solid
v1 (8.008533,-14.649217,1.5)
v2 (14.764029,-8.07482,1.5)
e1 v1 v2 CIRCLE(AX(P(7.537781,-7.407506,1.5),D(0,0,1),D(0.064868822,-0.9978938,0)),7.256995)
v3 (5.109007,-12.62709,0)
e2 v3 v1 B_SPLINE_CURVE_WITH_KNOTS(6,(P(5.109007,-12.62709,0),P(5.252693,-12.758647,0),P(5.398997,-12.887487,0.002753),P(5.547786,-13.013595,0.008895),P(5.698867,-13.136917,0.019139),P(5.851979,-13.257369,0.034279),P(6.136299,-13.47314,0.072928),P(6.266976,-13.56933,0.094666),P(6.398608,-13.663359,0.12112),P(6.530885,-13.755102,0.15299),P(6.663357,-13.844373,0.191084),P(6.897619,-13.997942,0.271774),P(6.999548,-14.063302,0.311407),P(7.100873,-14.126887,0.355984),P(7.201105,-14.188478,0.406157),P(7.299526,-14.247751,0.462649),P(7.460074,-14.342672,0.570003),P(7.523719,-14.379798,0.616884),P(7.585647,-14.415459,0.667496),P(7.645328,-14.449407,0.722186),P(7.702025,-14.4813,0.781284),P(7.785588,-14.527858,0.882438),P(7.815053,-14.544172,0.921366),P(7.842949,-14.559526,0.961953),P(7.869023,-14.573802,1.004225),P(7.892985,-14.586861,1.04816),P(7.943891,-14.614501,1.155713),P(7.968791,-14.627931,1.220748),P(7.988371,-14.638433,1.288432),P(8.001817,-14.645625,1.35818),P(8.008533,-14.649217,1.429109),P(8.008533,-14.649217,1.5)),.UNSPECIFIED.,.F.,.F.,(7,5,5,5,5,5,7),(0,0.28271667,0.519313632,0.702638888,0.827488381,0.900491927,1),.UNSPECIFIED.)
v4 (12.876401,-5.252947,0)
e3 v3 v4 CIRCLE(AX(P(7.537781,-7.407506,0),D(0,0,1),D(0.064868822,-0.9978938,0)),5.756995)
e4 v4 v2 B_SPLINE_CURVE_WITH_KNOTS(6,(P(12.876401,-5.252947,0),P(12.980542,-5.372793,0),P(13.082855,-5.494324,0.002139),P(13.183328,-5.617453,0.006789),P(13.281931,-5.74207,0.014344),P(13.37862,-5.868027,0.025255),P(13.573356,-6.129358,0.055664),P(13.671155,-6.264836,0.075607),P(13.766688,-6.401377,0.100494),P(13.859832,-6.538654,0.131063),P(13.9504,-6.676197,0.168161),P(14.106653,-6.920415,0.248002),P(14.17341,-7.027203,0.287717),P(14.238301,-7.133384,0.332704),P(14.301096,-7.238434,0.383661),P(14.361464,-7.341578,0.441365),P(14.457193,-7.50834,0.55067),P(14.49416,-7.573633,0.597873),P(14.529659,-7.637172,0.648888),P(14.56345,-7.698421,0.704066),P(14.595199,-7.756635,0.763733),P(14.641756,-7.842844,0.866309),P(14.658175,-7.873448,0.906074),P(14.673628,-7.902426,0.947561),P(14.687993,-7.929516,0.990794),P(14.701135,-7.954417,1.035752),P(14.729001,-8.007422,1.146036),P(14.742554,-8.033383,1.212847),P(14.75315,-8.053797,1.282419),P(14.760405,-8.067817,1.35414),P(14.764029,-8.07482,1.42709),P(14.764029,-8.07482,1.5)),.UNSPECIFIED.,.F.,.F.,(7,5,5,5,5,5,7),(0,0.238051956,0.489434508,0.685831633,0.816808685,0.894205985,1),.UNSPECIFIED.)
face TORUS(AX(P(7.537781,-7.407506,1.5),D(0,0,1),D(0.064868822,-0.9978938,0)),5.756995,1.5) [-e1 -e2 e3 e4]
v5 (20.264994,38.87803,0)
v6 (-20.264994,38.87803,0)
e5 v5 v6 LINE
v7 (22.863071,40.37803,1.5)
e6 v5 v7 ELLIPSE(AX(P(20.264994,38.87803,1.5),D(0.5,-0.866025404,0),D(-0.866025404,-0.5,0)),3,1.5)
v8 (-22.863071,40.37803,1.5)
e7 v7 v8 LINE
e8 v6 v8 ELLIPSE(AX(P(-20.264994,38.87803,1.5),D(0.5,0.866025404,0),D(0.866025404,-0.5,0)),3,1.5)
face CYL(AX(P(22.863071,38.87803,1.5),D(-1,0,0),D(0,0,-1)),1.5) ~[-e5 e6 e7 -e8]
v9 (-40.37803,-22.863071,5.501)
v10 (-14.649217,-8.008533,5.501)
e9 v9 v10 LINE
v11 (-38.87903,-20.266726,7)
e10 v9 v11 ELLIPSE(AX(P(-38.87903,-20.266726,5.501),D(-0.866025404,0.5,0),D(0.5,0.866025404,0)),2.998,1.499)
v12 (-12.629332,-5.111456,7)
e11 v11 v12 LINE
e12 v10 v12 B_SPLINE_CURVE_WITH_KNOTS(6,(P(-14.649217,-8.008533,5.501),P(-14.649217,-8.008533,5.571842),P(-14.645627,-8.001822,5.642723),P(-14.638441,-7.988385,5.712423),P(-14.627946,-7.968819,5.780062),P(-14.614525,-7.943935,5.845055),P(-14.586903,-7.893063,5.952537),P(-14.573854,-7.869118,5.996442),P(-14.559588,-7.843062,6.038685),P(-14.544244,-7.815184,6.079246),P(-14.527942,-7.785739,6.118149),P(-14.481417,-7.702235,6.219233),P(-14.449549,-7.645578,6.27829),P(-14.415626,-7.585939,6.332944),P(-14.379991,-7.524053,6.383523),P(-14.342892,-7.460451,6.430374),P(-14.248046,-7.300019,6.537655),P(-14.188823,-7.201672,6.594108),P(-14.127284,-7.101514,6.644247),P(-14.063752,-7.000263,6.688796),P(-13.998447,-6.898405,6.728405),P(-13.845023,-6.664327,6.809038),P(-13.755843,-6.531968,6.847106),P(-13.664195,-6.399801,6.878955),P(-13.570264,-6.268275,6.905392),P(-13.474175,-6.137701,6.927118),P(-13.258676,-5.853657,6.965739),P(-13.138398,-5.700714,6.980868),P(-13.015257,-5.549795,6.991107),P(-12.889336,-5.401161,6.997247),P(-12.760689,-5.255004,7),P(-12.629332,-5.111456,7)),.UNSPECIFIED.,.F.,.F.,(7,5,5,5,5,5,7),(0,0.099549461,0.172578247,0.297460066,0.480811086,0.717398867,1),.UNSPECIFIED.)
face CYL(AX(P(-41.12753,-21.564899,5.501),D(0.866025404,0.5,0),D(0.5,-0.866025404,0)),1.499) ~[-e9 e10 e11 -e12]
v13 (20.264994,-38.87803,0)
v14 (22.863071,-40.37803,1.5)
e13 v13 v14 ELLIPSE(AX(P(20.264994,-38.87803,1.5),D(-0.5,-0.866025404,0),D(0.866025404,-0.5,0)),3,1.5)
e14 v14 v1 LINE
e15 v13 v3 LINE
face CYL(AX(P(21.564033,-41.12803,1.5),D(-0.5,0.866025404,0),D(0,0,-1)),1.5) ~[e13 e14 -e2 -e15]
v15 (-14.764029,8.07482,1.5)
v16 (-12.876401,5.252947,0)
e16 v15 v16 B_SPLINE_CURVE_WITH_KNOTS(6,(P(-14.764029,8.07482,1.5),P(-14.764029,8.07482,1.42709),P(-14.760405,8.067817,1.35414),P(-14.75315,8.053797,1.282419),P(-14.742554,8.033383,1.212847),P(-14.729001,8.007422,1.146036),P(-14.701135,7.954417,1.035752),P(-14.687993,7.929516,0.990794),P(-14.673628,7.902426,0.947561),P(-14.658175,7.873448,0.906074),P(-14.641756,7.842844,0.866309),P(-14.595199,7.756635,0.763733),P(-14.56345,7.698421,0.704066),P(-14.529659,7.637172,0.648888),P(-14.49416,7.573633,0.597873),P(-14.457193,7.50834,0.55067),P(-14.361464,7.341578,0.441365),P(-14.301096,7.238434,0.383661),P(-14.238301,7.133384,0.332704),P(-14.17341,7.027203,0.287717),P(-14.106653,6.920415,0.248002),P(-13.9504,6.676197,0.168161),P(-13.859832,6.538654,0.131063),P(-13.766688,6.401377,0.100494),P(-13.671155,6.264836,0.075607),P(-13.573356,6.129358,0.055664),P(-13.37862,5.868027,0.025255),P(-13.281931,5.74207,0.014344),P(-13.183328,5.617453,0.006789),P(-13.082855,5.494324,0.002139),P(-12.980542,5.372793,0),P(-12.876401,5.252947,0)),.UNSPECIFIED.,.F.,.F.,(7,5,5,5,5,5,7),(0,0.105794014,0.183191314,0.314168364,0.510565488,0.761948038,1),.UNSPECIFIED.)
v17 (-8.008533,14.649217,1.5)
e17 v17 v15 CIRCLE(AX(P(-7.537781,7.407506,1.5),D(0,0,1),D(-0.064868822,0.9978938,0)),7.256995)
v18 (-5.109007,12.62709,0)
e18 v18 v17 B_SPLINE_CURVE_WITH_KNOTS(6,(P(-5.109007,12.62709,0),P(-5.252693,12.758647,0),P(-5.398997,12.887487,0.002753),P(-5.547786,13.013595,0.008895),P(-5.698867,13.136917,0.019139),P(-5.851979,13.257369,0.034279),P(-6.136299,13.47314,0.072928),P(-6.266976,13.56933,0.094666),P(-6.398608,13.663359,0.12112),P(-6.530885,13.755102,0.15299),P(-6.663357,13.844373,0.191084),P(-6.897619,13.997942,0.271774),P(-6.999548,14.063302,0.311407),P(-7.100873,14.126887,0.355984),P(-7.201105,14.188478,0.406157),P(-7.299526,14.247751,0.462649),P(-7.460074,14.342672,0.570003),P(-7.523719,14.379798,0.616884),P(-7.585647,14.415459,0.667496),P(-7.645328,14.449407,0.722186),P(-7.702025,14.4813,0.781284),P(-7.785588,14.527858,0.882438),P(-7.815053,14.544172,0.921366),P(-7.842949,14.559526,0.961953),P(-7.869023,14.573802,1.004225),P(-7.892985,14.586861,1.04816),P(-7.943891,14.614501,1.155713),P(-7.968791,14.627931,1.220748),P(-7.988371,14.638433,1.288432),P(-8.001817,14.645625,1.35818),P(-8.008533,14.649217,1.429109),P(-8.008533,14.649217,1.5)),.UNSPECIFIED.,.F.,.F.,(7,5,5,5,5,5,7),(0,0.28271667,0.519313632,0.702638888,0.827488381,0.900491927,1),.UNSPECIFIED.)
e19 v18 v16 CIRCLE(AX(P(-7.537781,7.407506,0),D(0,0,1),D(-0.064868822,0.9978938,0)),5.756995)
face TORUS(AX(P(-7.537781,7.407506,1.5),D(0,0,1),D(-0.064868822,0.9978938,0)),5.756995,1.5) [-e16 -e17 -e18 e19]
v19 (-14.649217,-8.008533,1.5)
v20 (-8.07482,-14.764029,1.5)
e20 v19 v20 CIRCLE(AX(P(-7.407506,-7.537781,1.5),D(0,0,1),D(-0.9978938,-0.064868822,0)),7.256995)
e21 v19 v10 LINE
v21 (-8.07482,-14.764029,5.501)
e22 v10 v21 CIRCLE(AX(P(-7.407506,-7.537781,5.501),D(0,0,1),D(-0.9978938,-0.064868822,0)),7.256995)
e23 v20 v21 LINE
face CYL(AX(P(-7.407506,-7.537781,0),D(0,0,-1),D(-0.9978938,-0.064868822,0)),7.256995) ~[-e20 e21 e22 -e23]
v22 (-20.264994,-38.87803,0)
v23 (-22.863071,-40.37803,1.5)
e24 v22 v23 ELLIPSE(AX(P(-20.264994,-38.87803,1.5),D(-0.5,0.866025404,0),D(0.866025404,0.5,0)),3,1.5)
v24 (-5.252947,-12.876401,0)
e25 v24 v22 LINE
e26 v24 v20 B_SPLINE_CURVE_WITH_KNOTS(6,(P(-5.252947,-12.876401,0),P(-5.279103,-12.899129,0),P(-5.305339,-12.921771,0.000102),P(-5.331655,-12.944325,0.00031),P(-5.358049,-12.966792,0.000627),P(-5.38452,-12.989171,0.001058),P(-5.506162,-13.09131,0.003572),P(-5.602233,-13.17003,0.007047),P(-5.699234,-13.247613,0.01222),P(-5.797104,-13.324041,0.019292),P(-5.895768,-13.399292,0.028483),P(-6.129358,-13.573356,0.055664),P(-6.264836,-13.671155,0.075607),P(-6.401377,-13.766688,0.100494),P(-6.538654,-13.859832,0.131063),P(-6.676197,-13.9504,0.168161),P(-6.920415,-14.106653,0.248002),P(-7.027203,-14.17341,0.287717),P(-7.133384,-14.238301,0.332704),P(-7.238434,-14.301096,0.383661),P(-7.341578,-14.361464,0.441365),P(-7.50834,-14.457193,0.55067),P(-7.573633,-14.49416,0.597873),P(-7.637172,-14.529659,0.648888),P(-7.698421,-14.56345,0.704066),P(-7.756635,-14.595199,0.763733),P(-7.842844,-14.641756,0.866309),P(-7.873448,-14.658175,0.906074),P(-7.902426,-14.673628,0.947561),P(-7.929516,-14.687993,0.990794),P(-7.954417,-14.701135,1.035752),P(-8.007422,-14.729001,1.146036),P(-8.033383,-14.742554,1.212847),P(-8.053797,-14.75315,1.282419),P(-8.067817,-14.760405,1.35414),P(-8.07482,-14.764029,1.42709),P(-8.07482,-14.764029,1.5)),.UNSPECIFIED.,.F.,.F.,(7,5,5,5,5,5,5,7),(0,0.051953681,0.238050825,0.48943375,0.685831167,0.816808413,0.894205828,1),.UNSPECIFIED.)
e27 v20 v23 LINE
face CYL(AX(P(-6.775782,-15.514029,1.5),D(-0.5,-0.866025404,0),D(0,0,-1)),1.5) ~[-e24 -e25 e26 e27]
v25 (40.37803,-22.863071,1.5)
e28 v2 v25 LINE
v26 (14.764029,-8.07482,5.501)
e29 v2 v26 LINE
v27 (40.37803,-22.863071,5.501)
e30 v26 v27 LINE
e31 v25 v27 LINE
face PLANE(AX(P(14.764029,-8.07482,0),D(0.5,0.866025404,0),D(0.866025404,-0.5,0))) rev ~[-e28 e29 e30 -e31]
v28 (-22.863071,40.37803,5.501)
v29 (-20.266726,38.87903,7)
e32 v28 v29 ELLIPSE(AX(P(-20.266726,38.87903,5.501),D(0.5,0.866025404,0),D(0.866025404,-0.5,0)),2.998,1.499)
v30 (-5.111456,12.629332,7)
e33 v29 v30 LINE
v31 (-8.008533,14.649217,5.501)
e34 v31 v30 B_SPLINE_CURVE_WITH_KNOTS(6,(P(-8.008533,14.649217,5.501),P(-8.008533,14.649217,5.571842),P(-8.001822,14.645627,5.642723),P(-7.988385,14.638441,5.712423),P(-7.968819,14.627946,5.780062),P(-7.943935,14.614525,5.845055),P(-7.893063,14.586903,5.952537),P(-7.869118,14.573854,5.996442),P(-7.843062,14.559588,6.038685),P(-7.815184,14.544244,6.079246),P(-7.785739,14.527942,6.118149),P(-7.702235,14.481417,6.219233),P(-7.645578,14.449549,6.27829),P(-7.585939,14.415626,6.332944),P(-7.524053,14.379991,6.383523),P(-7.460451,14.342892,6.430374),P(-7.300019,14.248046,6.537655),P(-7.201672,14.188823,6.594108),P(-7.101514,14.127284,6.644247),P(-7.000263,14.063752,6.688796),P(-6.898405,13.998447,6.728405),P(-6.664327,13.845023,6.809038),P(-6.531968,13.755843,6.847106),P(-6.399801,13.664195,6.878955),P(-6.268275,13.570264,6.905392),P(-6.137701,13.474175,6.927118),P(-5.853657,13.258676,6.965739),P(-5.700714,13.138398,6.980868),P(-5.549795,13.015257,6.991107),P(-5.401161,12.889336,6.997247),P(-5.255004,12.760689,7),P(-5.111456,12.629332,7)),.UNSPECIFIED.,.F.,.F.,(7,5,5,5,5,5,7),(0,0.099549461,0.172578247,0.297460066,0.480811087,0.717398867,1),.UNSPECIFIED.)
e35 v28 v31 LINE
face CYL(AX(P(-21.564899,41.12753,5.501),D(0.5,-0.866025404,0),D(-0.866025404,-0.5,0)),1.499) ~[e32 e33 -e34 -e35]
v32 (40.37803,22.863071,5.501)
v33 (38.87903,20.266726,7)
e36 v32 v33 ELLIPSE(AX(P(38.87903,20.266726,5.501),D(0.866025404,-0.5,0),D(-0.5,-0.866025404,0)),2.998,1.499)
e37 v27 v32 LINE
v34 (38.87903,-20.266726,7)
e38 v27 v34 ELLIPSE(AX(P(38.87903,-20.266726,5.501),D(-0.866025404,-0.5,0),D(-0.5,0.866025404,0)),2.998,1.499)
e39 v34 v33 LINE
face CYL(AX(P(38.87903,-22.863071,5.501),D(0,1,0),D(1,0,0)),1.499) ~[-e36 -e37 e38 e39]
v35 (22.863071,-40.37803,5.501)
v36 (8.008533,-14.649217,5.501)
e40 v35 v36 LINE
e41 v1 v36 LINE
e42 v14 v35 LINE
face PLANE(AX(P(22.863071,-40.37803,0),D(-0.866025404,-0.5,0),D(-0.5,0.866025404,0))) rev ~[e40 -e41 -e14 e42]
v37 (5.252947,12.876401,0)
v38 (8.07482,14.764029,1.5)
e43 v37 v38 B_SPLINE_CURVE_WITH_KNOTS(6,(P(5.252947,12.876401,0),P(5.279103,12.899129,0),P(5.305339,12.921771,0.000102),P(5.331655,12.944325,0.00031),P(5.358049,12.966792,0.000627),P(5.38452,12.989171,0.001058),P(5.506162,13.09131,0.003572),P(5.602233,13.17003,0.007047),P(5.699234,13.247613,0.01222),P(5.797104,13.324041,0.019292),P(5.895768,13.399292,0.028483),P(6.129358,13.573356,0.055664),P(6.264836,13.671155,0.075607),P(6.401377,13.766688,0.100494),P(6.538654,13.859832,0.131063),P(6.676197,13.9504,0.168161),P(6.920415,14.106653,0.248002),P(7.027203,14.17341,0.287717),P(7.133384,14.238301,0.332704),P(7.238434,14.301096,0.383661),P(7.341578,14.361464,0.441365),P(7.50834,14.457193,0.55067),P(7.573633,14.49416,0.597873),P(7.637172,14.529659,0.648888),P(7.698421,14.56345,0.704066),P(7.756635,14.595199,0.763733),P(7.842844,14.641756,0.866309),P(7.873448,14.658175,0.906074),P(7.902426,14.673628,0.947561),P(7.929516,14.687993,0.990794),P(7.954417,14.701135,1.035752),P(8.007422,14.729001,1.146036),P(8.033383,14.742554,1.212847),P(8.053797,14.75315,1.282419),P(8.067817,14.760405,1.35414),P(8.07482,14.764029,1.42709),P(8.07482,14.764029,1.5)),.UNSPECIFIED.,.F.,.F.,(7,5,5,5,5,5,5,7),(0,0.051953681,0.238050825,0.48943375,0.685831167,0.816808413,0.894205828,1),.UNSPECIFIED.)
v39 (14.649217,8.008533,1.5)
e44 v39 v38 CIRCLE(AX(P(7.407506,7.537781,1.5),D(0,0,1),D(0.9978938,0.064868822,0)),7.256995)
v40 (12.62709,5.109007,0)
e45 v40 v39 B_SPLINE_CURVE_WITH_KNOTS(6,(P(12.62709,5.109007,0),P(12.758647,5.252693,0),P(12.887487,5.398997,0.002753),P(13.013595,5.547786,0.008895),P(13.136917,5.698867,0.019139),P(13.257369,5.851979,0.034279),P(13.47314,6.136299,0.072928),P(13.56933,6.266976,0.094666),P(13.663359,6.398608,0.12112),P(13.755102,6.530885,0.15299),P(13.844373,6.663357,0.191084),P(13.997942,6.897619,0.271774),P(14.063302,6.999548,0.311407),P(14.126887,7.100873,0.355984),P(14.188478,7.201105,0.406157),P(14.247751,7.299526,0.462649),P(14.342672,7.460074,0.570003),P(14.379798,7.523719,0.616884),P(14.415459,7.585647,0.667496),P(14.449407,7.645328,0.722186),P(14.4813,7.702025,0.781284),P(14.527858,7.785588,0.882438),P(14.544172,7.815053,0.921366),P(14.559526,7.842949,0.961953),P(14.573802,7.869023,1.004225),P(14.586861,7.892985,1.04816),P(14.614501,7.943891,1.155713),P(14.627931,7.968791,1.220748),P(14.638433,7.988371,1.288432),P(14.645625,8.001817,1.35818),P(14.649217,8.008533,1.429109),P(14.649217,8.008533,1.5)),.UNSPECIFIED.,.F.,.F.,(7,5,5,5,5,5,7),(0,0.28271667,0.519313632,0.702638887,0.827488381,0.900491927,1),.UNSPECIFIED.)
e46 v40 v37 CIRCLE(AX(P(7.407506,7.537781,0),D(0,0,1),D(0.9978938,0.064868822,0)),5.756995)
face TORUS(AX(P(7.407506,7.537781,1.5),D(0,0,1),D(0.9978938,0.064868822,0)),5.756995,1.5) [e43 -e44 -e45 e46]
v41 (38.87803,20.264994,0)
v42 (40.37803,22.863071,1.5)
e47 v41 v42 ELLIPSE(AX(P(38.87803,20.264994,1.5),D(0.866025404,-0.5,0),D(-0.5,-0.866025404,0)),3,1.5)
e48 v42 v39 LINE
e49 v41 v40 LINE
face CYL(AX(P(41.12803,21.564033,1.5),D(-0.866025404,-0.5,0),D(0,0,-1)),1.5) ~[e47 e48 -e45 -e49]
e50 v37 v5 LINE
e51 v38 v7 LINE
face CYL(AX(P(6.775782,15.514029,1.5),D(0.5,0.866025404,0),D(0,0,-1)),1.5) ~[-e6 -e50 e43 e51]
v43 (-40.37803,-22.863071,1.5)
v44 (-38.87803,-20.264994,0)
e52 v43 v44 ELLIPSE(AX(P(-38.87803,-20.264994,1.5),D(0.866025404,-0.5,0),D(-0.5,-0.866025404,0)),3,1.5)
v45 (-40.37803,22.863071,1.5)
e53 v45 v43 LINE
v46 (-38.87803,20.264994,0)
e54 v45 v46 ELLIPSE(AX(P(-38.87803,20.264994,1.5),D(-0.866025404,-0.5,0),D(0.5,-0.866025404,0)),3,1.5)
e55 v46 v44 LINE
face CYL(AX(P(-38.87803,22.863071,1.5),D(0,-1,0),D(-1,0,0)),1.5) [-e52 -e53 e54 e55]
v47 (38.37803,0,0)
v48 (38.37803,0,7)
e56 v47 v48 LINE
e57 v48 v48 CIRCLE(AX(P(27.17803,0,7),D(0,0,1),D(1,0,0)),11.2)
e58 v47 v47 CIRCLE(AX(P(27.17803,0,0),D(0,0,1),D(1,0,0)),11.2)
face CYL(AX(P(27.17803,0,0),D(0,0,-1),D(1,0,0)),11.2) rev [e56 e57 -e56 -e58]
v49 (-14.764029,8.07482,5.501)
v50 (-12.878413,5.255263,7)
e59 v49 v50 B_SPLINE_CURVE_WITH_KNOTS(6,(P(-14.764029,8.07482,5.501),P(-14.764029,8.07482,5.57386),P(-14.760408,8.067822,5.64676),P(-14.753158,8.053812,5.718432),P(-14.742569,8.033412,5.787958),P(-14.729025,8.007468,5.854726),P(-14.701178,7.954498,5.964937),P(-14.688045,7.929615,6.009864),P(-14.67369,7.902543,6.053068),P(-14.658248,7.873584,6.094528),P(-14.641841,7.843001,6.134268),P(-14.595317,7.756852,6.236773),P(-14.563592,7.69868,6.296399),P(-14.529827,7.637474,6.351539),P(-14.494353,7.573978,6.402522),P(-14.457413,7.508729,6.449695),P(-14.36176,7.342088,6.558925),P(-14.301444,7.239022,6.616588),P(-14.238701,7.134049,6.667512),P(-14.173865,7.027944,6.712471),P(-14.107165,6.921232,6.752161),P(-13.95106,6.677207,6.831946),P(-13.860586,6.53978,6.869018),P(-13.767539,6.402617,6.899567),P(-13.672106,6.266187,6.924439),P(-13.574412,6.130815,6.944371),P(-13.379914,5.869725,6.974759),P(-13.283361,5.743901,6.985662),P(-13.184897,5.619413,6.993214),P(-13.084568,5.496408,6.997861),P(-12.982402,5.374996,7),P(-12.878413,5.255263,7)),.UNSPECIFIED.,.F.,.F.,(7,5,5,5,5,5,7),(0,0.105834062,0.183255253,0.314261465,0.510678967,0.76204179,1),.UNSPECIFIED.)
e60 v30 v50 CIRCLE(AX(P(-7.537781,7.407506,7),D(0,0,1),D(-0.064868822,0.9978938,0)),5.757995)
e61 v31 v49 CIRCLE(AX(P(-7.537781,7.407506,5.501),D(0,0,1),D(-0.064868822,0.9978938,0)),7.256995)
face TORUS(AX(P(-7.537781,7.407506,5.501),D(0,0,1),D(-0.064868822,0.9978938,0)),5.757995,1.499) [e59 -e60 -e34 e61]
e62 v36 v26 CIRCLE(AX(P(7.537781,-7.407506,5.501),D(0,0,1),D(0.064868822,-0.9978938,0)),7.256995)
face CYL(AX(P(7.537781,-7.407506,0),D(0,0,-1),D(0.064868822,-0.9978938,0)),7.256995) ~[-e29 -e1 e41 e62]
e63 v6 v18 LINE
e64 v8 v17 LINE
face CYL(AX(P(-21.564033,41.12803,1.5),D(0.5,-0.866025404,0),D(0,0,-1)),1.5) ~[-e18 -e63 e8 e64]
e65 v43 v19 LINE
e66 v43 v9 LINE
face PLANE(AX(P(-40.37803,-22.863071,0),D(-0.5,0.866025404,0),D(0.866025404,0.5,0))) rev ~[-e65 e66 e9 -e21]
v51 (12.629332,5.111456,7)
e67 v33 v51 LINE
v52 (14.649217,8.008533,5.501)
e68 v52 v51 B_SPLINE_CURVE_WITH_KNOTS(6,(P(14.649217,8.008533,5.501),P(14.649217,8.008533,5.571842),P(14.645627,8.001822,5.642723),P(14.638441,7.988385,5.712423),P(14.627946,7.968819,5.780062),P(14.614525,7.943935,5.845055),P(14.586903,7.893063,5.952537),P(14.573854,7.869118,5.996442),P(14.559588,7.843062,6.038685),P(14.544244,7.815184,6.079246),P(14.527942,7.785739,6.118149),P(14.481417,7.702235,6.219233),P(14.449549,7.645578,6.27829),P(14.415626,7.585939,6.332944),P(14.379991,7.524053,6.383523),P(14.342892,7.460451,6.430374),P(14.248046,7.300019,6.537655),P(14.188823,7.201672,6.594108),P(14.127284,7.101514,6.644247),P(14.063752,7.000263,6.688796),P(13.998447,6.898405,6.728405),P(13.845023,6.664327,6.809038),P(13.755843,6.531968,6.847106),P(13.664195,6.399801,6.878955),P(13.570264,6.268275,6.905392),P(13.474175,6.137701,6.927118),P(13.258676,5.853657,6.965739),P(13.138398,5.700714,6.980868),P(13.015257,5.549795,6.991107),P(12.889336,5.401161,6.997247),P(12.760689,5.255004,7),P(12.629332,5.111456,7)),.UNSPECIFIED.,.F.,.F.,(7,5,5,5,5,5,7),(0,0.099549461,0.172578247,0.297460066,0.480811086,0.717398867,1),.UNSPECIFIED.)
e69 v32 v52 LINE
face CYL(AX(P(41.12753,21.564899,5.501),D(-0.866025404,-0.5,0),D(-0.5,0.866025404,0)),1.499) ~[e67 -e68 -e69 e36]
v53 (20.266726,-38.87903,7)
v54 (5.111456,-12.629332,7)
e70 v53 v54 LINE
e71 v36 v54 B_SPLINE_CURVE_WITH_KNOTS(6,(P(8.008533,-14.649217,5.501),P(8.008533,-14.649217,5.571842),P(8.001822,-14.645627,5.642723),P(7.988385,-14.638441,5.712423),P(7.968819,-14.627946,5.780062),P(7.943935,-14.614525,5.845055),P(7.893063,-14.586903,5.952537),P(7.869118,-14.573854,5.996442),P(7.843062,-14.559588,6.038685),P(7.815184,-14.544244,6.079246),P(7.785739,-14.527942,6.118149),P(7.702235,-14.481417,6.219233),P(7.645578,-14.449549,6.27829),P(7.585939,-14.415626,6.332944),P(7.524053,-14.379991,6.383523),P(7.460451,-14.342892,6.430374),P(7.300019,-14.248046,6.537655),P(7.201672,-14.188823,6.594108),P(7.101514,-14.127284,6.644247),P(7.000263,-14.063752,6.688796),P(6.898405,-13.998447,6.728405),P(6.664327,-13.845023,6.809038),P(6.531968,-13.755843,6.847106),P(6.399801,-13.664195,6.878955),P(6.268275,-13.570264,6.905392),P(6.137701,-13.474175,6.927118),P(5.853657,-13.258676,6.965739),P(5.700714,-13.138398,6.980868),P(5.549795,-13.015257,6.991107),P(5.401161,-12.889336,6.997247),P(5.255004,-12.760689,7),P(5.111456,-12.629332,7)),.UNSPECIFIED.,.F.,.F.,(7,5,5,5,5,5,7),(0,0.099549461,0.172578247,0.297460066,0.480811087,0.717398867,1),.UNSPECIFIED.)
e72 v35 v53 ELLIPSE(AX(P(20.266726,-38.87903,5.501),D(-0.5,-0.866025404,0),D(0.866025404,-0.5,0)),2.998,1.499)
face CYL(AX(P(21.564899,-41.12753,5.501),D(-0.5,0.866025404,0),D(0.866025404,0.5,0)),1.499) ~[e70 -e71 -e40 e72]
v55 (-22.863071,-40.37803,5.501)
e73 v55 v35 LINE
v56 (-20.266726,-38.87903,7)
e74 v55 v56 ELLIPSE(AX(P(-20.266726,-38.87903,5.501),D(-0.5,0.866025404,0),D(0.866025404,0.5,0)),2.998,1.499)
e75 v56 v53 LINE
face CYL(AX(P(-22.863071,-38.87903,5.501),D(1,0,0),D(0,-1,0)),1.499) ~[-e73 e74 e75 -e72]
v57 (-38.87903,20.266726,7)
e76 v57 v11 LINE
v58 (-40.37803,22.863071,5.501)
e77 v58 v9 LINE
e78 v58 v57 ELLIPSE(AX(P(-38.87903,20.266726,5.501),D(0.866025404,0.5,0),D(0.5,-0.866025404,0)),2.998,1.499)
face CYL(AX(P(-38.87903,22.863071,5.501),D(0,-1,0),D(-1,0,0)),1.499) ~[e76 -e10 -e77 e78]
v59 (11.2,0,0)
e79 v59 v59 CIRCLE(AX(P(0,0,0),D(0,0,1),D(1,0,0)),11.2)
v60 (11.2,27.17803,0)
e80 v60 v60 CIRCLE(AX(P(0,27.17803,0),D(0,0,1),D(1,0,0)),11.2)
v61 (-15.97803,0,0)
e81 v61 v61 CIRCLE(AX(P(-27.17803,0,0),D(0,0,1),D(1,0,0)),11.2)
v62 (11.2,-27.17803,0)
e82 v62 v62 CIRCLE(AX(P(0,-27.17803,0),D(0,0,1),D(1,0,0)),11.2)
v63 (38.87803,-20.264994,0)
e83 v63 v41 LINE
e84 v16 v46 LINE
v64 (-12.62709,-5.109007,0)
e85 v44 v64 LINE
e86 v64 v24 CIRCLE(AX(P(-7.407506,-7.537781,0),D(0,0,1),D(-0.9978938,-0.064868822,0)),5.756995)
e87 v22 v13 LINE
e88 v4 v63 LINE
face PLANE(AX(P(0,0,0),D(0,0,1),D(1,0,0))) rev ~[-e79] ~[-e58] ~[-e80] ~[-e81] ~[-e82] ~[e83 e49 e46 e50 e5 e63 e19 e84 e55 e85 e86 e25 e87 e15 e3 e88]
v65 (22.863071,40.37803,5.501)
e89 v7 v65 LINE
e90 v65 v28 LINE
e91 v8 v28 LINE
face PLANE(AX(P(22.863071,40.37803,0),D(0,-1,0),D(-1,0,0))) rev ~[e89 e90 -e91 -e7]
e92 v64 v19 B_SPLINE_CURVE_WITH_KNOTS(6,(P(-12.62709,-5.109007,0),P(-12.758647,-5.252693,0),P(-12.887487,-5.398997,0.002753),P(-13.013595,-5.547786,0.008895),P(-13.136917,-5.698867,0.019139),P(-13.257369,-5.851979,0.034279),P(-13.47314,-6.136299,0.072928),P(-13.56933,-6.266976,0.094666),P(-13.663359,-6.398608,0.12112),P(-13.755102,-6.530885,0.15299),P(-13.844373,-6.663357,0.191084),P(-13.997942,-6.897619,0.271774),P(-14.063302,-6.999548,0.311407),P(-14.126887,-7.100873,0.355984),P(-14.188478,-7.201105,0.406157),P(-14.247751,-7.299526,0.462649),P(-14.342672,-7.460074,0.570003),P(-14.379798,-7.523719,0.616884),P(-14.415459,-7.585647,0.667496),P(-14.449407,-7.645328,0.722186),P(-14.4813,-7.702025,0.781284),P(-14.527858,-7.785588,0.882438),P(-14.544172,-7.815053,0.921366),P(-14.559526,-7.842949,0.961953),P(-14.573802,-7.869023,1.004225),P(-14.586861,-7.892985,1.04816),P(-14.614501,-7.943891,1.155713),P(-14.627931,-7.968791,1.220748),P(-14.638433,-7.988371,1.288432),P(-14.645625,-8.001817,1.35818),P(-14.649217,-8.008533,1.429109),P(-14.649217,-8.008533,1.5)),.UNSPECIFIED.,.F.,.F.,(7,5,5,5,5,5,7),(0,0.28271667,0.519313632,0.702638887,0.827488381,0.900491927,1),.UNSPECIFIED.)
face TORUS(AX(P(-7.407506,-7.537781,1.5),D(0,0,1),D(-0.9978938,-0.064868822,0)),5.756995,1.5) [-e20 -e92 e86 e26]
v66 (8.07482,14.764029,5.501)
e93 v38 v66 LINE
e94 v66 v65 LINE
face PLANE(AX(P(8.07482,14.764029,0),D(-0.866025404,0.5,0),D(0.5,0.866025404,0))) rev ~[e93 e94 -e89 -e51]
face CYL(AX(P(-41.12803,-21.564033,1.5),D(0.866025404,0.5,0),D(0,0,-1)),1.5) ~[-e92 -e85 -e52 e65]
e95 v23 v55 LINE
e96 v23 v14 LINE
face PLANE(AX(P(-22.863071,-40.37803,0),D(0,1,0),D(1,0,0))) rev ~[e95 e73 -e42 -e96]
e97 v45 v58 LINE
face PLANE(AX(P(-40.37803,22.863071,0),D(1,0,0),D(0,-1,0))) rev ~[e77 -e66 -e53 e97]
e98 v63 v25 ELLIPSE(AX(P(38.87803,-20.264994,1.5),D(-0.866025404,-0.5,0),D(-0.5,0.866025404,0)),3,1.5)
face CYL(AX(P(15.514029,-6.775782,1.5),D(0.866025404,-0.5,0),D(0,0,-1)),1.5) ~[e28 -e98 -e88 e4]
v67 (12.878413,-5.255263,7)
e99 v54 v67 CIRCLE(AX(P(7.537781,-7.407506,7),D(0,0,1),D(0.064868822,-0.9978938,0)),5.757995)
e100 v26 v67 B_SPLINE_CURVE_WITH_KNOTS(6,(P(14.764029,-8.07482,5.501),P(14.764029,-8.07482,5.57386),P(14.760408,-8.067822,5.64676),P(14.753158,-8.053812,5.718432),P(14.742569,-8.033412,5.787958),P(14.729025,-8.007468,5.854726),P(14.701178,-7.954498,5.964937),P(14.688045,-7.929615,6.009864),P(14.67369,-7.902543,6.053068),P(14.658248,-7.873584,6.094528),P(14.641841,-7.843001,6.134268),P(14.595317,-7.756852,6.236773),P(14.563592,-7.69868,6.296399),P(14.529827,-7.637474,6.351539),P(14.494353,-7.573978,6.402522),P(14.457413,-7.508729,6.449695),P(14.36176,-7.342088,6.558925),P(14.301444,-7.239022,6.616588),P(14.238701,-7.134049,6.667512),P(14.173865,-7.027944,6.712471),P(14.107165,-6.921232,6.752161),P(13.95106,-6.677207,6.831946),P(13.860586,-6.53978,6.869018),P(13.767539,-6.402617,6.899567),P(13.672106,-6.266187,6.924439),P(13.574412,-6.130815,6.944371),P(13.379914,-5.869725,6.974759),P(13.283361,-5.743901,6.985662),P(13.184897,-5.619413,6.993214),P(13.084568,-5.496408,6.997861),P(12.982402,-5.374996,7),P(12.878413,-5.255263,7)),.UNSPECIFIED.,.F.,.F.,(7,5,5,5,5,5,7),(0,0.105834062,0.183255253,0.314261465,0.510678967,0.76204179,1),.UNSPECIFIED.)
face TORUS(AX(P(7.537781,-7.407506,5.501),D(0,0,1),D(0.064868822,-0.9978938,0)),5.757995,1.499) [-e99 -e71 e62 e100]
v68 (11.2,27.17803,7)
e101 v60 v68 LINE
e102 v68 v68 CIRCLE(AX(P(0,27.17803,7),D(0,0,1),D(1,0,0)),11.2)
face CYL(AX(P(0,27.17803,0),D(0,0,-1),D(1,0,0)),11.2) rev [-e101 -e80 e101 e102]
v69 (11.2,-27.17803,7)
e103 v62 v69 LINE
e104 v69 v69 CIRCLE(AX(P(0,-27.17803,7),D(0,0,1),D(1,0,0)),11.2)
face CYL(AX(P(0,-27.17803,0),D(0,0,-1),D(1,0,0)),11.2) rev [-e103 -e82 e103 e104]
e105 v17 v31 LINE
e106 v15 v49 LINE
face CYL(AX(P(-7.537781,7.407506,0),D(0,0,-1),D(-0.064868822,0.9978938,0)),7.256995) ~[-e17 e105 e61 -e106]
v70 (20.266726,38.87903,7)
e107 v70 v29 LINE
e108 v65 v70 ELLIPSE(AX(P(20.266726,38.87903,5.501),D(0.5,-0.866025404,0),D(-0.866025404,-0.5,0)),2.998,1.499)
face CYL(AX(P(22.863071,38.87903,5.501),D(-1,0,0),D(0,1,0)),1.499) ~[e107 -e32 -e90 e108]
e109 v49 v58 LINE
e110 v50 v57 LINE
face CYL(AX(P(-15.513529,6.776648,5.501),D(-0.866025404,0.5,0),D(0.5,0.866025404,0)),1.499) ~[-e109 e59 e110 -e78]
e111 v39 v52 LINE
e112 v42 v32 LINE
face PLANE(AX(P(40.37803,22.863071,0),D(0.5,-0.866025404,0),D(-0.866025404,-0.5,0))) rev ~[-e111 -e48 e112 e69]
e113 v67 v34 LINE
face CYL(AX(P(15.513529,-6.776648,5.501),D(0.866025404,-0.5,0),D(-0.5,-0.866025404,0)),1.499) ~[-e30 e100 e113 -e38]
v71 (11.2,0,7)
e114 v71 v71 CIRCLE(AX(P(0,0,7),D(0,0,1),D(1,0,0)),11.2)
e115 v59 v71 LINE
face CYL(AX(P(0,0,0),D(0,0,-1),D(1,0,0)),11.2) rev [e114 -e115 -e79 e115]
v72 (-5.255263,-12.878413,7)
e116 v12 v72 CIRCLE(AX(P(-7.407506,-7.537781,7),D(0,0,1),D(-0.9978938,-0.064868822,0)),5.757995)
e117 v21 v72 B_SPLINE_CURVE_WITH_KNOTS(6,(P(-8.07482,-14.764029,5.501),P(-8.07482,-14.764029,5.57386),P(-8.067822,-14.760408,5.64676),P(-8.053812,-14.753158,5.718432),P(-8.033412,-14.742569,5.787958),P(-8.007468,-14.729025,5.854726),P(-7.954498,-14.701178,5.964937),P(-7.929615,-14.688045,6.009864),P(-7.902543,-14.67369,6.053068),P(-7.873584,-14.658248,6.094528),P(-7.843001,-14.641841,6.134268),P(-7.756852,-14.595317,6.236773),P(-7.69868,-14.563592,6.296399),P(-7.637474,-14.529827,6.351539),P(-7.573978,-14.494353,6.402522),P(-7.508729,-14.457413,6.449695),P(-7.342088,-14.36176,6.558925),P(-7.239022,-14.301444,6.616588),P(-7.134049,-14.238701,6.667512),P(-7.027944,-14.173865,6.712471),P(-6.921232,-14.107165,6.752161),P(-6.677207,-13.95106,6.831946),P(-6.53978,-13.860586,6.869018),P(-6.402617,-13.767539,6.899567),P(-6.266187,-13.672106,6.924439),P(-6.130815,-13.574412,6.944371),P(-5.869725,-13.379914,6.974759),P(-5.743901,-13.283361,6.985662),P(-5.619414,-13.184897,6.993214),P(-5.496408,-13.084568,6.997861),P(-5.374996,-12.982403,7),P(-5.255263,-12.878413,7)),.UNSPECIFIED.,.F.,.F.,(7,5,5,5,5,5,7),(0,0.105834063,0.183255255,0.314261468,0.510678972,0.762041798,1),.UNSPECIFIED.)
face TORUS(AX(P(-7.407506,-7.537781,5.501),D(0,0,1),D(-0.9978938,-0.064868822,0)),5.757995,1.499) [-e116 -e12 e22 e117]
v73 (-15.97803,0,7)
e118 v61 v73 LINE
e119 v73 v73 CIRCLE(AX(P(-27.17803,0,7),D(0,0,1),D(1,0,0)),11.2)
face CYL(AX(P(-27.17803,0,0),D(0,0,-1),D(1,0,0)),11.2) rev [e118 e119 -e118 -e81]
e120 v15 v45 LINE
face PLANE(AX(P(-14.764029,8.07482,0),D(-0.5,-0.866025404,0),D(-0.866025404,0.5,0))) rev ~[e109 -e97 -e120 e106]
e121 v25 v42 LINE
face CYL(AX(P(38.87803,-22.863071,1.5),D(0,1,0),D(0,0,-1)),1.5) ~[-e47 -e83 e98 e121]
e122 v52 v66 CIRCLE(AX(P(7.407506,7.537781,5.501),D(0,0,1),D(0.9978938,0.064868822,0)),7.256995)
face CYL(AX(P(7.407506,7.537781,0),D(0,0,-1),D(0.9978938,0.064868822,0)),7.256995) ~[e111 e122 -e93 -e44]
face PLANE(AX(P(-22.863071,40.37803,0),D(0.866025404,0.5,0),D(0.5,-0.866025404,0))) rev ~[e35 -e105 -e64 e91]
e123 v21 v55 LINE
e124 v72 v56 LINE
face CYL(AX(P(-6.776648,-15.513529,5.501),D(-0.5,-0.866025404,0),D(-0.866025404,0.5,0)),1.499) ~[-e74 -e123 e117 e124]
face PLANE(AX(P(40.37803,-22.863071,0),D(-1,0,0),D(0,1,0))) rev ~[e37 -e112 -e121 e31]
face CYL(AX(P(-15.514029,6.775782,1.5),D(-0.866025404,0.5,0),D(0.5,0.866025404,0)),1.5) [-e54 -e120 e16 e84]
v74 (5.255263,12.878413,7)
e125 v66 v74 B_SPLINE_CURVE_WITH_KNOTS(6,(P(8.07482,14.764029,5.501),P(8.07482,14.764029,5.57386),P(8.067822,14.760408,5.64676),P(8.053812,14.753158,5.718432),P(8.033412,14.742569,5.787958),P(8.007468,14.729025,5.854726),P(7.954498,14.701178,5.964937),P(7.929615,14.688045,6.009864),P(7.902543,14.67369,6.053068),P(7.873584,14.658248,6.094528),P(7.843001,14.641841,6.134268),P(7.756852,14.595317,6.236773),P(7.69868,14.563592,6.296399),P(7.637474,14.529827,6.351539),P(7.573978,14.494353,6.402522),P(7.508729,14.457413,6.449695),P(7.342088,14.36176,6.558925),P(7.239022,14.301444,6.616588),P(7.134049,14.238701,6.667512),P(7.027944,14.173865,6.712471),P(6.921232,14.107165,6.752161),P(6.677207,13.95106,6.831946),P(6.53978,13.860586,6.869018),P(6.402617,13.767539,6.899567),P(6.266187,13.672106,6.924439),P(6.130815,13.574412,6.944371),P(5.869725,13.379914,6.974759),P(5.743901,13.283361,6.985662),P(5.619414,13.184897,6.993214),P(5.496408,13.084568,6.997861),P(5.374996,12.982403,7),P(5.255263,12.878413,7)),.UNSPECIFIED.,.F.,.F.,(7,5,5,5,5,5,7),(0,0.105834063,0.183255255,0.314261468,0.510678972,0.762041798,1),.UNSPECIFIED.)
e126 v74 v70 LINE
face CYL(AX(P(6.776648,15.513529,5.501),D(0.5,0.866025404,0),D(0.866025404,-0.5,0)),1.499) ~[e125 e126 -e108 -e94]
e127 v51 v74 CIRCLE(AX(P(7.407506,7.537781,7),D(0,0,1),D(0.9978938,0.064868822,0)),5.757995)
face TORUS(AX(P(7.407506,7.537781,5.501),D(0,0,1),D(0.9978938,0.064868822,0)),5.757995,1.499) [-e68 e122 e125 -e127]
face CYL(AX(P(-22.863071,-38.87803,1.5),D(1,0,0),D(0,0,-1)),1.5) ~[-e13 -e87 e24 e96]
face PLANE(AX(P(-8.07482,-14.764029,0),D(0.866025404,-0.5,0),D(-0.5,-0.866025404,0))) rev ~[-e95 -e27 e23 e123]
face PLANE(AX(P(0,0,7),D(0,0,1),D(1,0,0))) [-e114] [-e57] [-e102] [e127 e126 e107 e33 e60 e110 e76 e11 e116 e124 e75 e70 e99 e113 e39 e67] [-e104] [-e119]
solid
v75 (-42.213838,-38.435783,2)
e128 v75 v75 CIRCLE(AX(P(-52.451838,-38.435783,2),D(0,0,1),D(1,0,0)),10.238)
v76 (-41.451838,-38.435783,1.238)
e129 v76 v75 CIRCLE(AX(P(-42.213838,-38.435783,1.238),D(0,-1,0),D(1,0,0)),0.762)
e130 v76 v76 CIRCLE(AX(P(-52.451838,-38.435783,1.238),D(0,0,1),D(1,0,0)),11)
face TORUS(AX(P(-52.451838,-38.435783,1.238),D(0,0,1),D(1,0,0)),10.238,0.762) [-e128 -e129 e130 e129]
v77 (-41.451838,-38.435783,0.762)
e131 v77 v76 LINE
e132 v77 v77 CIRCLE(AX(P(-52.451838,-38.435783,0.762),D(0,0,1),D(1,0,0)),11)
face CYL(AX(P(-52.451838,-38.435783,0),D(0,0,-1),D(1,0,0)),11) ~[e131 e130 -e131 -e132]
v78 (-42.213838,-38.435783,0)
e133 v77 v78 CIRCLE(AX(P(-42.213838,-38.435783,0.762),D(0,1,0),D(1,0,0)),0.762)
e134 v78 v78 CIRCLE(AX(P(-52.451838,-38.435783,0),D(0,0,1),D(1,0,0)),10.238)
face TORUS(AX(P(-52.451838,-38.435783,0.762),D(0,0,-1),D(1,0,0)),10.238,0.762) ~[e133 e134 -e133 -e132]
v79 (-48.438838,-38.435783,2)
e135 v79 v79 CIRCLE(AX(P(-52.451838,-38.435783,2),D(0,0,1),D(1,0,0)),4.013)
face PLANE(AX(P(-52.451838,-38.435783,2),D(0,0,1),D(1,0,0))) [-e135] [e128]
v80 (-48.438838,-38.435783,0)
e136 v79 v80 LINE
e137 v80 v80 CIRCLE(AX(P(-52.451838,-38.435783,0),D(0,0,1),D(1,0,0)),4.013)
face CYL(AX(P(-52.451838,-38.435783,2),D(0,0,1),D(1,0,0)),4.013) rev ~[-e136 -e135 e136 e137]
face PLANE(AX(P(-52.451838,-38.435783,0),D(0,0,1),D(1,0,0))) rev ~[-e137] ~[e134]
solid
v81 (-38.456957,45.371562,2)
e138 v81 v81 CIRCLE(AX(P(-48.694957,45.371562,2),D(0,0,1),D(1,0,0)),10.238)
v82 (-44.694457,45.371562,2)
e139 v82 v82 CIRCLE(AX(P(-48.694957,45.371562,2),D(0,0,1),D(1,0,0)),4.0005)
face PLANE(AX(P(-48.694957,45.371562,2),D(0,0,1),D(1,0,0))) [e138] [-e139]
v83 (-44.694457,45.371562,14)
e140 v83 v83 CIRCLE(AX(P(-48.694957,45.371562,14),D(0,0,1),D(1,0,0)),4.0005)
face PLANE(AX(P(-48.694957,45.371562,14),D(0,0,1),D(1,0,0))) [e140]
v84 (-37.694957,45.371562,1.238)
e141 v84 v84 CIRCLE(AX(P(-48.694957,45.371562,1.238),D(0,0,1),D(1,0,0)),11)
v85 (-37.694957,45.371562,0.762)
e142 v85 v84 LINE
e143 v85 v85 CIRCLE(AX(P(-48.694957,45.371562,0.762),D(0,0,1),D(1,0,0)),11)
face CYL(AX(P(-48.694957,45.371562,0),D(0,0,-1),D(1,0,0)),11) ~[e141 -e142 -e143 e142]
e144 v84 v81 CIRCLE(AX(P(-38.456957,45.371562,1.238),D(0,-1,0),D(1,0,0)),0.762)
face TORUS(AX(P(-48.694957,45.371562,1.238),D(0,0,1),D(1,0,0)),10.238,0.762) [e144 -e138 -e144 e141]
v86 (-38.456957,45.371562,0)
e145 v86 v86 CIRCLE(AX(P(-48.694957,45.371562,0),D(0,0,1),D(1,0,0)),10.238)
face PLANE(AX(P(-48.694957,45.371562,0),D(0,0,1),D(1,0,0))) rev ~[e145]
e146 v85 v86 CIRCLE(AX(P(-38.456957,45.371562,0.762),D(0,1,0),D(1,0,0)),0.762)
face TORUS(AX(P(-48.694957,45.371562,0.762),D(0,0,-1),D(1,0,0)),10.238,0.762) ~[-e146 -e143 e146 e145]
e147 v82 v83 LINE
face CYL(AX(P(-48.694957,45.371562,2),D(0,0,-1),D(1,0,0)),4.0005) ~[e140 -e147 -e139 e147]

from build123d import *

# Parameters (mm, degrees)
F0_R      = 11.2
F1_DEPTH  = 7
F2_R      = 1.499
F3_R      = 1.5
F4_R      = 11
F5_DEPTH  = 2
F6_R      = 4.0005
F7_DEPTH  = 12
F8_R      = 0.762
F9_R      = 11
F10_DEPTH = 2
F11_R     = 4.013
F12_DEPTH = 2
F13_R     = 4.013
F14_DEPTH = 2
F15_R     = 0.762


# Not quite as in the source:
# - a fillet or chamfer is up to 0.001 mm smaller than in the source, because OpenCascade refuses the exact size


with BuildPart() as f1:
    # F0 (on Top) → F1 (new body)
    with BuildSketch(Plane.XY):
        with BuildLine():
            Line((-40.3780304611, 22.8630706599), (-40.3780304611, -22.8630706599))
            Line((-40.3780304611, -22.8630706599), (-14.6492169979, -8.008533281))
            ThreePointArc((-14.6492169979, -8.008533281), (-12.6082129963, -12.5990680914), (-8.0748202901, -14.7640294654))
            Line((-8.0748202901, -14.7640294654), (-22.8630706599, -40.3780304611))
            Line((-22.8630706599, -40.3780304611), (22.8630706599, -40.3780304611))
            Line((22.8630706599, -40.3780304611), (8.008533281, -14.6492169979))
            ThreePointArc((8.008533281, -14.6492169979), (12.5990680914, -12.6082129963), (14.7640294654, -8.0748202901))
            Line((14.7640294654, -8.0748202901), (40.3780304611, -22.8630706599))
            Line((40.3780304611, -22.8630706599), (40.3780304611, 22.8630706599))
            Line((40.3780304611, 22.8630706599), (14.6492169979, 8.008533281))
            ThreePointArc((14.6492169979, 8.008533281), (12.6082129963, 12.5990680914), (8.0748202901, 14.7640294654))
            Line((8.0748202901, 14.7640294654), (22.8630706599, 40.3780304611))
            Line((22.8630706599, 40.3780304611), (-22.8630706599, 40.3780304611))
            Line((-22.8630706599, 40.3780304611), (-8.008533281, 14.6492169979))
            ThreePointArc((-8.008533281, 14.6492169979), (-12.5990680914, 12.6082129963), (-14.7640294654, 8.0748202901))
            Line((-14.7640294654, 8.0748202901), (-40.3780304611, 22.8630706599))
        make_face()
        with Locations((0, -27.1780304611)):
            Circle(F0_R, mode=Mode.SUBTRACT)
        with Locations((-27.1780304611, 0)):
            Circle(F0_R, mode=Mode.SUBTRACT)
        Circle(F0_R, mode=Mode.SUBTRACT)
        with Locations((27.1780304611, 0)):
            Circle(F0_R, mode=Mode.SUBTRACT)
        with Locations((0, 27.1780304611)):
            Circle(F0_R, mode=Mode.SUBTRACT)
    extrude(amount=F1_DEPTH)

    # F2 (radius 1.5 in the source; OpenCascade refuses exactly that, so slightly less here)
    f2_edges = [f1.edges().sort_by_distance(p)[0] for p in [
        (0, -40.37803, 7),
        (-15.468945, -27.57103, 7),
        (-12.608213, -12.599068, 7),
        (-27.513624, -15.435802, 7),
        (-40.37803, 0, 7),
        (-27.57103, 15.468945, 7),
        (-12.599068, 12.608213, 7),
        (-15.435802, 27.513624, 7),
        (0, 40.37803, 7),
        (15.468945, 27.57103, 7),
        (27.513624, 15.435802, 7),
        (12.608213, 12.599068, 7),
        (40.37803, 0, 7),
        (27.57103, -15.468945, 7),
        (12.599068, -12.608213, 7),
        (15.435802, -27.513624, 7),
    ]]
    fillet(f2_edges, radius=F2_R)

    # F3
    f3_edges = [f1.edges().sort_by_distance(p)[0] for p in [
        (0, -40.37803, 0),
        (15.435802, -27.513624, 0),
        (-15.468945, -27.57103, 0),
        (-40.37803, 0, 0),
        (-27.513624, -15.435802, 0),
        (-27.57103, 15.468945, 0),
        (-12.608213, -12.599068, 0),
        (-12.599068, 12.608213, 0),
        (-15.435802, 27.513624, 0),
        (0, 40.37803, 0),
        (15.468945, 27.57103, 0),
        (12.608213, 12.599068, 0),
        (27.513624, 15.435802, 0),
        (40.37803, 0, 0),
        (27.57103, -15.468945, 0),
        (12.599068, -12.608213, 0),
    ]]
    fillet(f3_edges, radius=F3_R)

    # F11 (on face) → F12 (cut)
    with BuildSketch(Plane.XY.offset(2)):
        with Locations((-52.4518378079, -38.4357832372)):
            Circle(F11_R)
    extrude(amount=F12_DEPTH, mode=Mode.SUBTRACT)


with BuildPart() as f5:
    # F4 (on Top) → F5 (new body)
    with BuildSketch(Plane.XY):
        with Locations((-48.6949570477, 45.3715622425)):
            Circle(F4_R)
    extrude(amount=F5_DEPTH)

    # F6 (on face) → F7 (join)
    with BuildSketch(Plane.XY.offset(2)):
        with Locations((-48.6949570477, 45.3715622425)):
            Circle(F6_R)
    extrude(amount=F7_DEPTH)

    # F8
    f8_edges = [f5.edges().sort_by_distance(p)[0] for p in [
        (-59.694957, 45.371562, 2),
        (-59.694957, 45.371562, 0),
    ]]
    fillet(f8_edges, radius=F8_R)


with BuildPart() as f10:
    # F9 (on Top) → F10 (new body)
    with BuildSketch(Plane.XY):
        with Locations((-52.4518378079, -38.4357832372)):
            Circle(F9_R)
    extrude(amount=F10_DEPTH)

    # F13 (on face) → F14 (cut)
    with BuildSketch(Plane.XY.offset(2)):
        with Locations((-52.4518378079, -38.4357832372)):
            Circle(F13_R)
    extrude(amount=-F14_DEPTH, mode=Mode.SUBTRACT)

    # F15
    f15_edges = [f10.edges().sort_by_distance(p)[0] for p in [
        (-63.451838, -38.435783, 2),
        (-63.451838, -38.435783, 0),
    ]]
    fillet(f15_edges, radius=F15_R)


solid = Compound([f1.part, f5.part, f10.part])
